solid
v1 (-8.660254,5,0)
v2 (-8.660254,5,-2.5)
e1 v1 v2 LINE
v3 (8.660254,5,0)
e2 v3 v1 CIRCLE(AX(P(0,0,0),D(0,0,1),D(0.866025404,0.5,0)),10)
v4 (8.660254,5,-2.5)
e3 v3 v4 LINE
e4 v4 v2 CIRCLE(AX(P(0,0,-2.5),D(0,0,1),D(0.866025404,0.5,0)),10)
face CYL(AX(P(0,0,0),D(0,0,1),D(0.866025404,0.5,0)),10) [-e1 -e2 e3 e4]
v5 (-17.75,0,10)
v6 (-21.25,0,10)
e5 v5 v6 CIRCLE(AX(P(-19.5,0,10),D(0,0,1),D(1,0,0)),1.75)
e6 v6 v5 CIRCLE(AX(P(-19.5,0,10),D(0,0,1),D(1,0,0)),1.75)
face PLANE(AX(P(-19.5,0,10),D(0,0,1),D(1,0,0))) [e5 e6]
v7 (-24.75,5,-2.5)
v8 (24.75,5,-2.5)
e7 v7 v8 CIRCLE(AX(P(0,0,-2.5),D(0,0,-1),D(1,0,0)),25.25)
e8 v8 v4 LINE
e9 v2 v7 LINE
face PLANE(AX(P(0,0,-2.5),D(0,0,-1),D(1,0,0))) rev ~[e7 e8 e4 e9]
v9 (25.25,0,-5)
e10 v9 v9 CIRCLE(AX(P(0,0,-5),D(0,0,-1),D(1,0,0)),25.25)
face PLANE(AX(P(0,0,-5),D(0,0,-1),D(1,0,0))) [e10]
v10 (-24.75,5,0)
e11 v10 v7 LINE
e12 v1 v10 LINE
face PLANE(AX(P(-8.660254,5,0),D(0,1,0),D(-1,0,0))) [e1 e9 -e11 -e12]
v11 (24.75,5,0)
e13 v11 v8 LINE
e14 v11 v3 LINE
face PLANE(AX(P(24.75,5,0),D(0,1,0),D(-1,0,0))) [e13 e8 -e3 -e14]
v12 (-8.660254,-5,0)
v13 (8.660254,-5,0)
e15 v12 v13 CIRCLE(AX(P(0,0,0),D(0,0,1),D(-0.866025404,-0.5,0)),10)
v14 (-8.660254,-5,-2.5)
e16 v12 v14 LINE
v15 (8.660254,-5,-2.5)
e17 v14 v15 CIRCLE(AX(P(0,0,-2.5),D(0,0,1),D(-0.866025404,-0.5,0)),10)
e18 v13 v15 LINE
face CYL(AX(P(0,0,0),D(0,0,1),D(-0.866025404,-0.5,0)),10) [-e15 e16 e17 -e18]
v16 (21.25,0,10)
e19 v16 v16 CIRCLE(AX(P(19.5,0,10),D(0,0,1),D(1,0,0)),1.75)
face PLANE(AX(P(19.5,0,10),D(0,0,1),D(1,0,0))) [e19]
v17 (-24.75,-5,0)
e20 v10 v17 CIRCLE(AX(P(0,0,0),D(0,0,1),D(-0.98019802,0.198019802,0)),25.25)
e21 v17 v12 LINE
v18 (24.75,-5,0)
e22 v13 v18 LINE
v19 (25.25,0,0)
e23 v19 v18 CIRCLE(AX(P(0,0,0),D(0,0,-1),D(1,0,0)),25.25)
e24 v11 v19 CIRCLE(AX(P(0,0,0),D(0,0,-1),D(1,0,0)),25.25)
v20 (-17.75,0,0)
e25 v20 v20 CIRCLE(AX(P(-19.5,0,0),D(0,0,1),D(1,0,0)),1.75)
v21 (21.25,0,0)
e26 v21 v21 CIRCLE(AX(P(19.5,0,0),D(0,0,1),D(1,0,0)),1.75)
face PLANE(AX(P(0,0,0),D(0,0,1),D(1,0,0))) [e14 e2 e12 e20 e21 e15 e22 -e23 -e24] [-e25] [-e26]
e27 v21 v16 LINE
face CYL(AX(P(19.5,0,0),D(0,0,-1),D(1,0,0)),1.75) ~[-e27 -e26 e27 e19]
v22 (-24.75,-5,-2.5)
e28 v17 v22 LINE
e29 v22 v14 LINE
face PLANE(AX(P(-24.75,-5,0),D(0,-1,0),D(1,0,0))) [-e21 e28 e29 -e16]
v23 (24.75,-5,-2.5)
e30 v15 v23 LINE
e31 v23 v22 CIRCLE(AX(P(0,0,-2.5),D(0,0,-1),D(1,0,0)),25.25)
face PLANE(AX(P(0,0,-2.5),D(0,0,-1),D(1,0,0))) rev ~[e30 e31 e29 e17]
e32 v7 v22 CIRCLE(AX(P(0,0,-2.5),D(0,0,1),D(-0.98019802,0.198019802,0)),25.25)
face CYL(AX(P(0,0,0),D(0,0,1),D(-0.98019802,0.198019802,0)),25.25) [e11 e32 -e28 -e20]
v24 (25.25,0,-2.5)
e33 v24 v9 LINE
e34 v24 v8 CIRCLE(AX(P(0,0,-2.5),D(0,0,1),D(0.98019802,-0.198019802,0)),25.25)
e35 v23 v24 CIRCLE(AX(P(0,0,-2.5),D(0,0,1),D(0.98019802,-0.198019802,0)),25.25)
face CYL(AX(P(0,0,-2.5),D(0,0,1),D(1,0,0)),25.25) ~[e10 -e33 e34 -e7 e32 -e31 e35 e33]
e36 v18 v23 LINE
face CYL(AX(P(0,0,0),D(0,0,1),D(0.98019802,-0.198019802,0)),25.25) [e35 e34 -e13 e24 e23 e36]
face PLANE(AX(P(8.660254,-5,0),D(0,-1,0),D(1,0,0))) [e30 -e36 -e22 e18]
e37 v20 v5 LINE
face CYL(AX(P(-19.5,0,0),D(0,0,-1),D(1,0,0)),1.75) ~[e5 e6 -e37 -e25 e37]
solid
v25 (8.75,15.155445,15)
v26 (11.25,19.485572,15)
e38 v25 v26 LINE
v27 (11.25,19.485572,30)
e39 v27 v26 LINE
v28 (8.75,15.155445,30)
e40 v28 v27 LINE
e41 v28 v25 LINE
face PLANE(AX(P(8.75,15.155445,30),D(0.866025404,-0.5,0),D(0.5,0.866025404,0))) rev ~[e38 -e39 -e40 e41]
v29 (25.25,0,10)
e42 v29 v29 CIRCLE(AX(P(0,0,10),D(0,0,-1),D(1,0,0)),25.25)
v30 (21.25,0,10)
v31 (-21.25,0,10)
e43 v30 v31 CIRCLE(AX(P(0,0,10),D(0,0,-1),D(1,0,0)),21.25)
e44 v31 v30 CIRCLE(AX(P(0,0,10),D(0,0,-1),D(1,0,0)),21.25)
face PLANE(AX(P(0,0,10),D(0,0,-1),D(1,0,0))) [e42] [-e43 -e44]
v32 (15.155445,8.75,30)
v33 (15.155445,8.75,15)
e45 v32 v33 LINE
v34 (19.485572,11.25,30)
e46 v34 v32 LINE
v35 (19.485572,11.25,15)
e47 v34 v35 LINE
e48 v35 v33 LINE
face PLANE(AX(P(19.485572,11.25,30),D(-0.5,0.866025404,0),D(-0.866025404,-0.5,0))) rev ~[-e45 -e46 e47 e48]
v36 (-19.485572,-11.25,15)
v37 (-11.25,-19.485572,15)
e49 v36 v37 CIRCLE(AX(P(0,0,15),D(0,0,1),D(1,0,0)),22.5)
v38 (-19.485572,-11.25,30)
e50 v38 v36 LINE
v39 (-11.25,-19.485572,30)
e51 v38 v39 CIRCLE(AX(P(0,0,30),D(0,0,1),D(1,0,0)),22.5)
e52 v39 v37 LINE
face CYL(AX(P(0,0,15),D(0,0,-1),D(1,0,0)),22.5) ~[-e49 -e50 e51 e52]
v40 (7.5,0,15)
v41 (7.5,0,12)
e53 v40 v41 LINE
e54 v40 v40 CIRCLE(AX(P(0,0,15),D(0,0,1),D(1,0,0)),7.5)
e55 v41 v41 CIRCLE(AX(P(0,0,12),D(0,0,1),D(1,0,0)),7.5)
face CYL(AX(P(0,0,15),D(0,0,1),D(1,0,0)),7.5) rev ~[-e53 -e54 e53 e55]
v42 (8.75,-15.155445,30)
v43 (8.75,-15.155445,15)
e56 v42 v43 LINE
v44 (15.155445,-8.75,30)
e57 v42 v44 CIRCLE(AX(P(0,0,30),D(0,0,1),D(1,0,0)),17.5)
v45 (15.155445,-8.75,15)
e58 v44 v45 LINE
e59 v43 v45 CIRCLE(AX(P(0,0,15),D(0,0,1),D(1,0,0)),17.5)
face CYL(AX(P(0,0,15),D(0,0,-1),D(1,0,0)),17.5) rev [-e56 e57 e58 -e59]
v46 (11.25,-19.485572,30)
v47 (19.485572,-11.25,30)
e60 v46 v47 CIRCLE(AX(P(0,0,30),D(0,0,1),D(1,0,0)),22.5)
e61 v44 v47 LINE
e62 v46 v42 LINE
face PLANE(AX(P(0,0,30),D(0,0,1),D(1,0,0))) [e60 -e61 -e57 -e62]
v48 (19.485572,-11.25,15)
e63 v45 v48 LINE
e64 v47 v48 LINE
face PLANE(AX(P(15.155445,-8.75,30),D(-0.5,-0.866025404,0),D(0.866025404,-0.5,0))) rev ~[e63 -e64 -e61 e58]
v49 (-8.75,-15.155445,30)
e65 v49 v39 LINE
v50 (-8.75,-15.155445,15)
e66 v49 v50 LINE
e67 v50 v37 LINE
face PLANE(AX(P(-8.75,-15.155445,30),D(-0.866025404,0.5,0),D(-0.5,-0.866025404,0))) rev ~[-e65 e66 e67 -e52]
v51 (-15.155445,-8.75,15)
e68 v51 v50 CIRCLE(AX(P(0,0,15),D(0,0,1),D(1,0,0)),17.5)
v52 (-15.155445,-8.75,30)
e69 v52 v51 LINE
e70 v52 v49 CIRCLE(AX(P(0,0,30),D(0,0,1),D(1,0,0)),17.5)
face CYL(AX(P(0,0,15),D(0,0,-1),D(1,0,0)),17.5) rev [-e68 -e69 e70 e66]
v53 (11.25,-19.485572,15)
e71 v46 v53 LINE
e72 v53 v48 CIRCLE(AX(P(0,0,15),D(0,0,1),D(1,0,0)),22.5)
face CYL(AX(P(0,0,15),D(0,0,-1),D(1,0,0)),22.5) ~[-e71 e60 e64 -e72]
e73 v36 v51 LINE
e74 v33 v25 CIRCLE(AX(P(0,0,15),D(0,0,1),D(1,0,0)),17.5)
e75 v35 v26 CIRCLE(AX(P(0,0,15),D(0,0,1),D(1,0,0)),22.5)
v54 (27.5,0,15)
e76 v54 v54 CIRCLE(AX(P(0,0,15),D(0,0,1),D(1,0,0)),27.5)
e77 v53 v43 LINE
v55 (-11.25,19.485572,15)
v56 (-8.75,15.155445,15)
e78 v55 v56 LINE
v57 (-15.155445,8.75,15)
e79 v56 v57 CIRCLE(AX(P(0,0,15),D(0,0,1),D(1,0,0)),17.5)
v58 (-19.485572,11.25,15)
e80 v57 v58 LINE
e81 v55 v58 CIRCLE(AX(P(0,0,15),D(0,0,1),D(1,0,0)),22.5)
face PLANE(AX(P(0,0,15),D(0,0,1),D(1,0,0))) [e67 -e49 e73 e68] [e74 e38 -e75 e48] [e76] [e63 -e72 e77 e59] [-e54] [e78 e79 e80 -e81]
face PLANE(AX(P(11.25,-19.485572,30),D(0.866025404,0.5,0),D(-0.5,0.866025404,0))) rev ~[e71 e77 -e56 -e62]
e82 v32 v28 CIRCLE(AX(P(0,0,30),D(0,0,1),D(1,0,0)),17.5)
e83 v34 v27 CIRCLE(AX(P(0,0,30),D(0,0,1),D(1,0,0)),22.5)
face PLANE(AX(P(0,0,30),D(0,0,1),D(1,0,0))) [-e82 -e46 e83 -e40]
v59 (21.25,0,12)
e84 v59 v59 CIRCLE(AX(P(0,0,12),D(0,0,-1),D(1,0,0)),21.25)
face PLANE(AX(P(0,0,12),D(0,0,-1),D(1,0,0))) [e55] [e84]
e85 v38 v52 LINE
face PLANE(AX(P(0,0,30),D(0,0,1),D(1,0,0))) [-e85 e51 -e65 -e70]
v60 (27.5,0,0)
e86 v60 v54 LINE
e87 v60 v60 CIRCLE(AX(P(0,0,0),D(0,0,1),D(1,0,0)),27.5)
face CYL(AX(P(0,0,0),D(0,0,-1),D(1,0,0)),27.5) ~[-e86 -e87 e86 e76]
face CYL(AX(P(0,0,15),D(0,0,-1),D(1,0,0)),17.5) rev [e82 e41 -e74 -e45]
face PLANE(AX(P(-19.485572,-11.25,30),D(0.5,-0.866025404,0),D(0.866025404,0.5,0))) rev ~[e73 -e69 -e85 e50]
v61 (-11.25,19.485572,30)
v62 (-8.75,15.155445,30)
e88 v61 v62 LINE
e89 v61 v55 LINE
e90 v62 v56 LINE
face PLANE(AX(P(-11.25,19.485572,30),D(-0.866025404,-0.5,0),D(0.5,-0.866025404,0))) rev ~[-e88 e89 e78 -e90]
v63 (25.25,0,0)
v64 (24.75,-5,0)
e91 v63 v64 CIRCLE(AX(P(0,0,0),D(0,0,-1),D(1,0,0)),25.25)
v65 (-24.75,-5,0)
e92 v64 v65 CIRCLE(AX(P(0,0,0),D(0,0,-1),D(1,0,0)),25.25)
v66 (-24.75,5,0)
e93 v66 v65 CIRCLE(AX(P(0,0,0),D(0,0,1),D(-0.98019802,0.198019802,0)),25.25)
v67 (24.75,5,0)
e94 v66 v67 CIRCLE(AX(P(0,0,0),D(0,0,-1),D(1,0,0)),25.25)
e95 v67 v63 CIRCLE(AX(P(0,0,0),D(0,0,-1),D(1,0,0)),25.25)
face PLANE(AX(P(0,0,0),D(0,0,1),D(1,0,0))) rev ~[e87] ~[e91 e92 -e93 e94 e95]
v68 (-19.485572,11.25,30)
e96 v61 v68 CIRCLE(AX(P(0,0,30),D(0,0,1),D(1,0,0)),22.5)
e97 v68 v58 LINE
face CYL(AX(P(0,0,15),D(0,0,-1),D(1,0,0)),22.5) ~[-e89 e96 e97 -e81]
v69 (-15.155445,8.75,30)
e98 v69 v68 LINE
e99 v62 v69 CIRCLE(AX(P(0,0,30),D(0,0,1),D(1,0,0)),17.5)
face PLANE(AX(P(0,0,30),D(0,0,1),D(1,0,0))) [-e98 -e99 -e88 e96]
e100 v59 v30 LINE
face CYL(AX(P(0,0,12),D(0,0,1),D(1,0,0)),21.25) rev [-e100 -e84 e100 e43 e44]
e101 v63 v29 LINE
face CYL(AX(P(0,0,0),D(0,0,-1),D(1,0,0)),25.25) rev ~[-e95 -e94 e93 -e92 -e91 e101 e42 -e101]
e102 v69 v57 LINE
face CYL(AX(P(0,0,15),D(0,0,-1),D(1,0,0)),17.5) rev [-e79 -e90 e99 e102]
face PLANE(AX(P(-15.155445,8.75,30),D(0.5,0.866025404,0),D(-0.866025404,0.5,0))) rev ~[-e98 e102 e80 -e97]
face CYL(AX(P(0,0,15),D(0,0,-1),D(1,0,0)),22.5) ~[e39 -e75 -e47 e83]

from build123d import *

# Parameters (mm, degrees)
F0_R      = 27.5
F1_DEPTH  = 15
F2_R      = 25.25
F3_DEPTH  = 12
F4_R      = 25.25
F4_R_2    = 21.25
F5_DEPTH  = 2
F6_R      = 7.5
F7_DEPTH  = 3
F8_R      = 22.5
F8_R_2    = 17.5
F9_DEPTH  = 15
F11_DEPTH = 15
F13_DEPTH = 2.5
F14_R     = 1.75
F15_DEPTH = 10
F16_R     = 25.25
F17_DEPTH = 2.5


# Not quite as in the source:
# - after a boolean that leaves OpenCascade's solid faulty, fix() repairs it


with BuildPart() as f1:
    # F0 (on Top) → F1 (new body)
    with BuildSketch(Plane.XY):
        Circle(F0_R)
    extrude(amount=F1_DEPTH)

    # F2 (on face) → F3 (cut)
    with BuildSketch(Plane(origin=(0, 0, 0), x_dir=(1, 0, 0), z_dir=(0, 0, -1))):
        Circle(F2_R)
    extrude(amount=-F3_DEPTH, mode=Mode.SUBTRACT)

    # F4 (on face) → F5 (join)
    with BuildSketch(Plane(origin=(0, 0, 12), x_dir=(1, 0, 0), z_dir=(0, 0, -1))):
        Circle(F4_R)
        Circle(F4_R_2, mode=Mode.SUBTRACT)
    extrude(amount=F5_DEPTH)

    # F6 (on face) → F7 (cut, through all)
    with BuildSketch(Plane.XY.offset(15)):
        Circle(F6_R)
    extrude(amount=-F7_DEPTH, mode=Mode.SUBTRACT)

    # F8 (on face) → F9 (join)
    with BuildSketch(Plane.XY.offset(15)):
        Circle(F8_R)
        Circle(F8_R_2, mode=Mode.SUBTRACT)
    extrude(amount=F9_DEPTH)

    # F10 (on face) → F11 (cut, through all)
    with BuildSketch(Plane.XY.offset(30)):
        with BuildLine():
            ThreePointArc((-15.1554445662, -8.75), (-17.5, 0), (-15.1554445662, 8.75))
            Line((-15.1554445662, 8.75), (-19.4855715851, 11.25))
            ThreePointArc((-19.4855715851, 11.25), (-22.5, 0), (-19.4855715851, -11.25))
            Line((-19.4855715851, -11.25), (-15.1554445662, -8.75))
        make_face()
        with BuildLine():
            ThreePointArc((8.75, -15.1554445662), (0, -17.5), (-8.75, -15.1554445662))
            Line((-8.75, -15.1554445662), (-11.25, -19.4855715851))
            ThreePointArc((-11.25, -19.4855715851), (0, -22.5), (11.25, -19.4855715851))
            Line((11.25, -19.4855715851), (8.75, -15.1554445662))
        make_face()
        with BuildLine():
            Line((19.4855715851, 11.25), (15.1554445662, 8.75))
            ThreePointArc((15.1554445662, 8.75), (16.9037019601, 4.5293332893), (17.5, 0))
            ThreePointArc((17.5, 0), (16.9037019601, -4.5293332893), (15.1554445662, -8.75))
            Line((15.1554445662, -8.75), (19.4855715851, -11.25))
            ThreePointArc((19.4855715851, -11.25), (21.7333310915, -5.8234285148), (22.5, 0))
            ThreePointArc((22.5, 0), (21.7333310915, 5.8234285148), (19.4855715851, 11.25))
        make_face()
        with BuildLine():
            ThreePointArc((-8.75, 15.1554445662), (0, 17.5), (8.75, 15.1554445662))
            Line((8.75, 15.1554445662), (11.25, 19.4855715851))
            ThreePointArc((11.25, 19.4855715851), (0, 22.5), (-11.25, 19.4855715851))
            Line((-11.25, 19.4855715851), (-8.75, 15.1554445662))
        make_face()
    extrude(amount=-F11_DEPTH, mode=Mode.SUBTRACT)



with BuildPart() as f13:
    # F12 (on Top) → F13 (new body)
    with BuildSketch(Plane.XY):
        with BuildLine():
            Line((-24.75, -5), (-8.6602540378, -5))
            ThreePointArc((-8.6602540378, -5), (0, -10), (8.6602540378, -5))
            Line((8.6602540378, -5), (24.75, -5))
            ThreePointArc((24.75, -5), (25.25, 0), (24.75, 5))
            Line((24.75, 5), (8.6602540378, 5))
            ThreePointArc((8.6602540378, 5), (0, 10), (-8.6602540378, 5))
            Line((-8.6602540378, 5), (-24.75, 5))
            ThreePointArc((-24.75, 5), (-25.25, 0), (-24.75, -5))
        make_face()
    extrude(amount=-F13_DEPTH)


with BuildPart() as f1_1:
    add(f1.part)

    add(f13.part)  # F15 merges F13
    # F14 (on face) → F15 (join)
    with BuildSketch(Plane.XY):
        with Locations((-19.5, 0)):
            Circle(F14_R)
        with Locations((19.5, 0)):
            Circle(F14_R)
    extrude(amount=F15_DEPTH)

    # F16 (on face) → F17 (join)
    with BuildSketch(Plane(origin=(0, 0, -2.5), x_dir=(1, 0, 0), z_dir=(0, 0, -1))):
        Circle(F16_R)
    extrude(amount=F17_DEPTH)

    add(f1_1.part.fix(), mode=Mode.REPLACE)


solid = f1_1.part
